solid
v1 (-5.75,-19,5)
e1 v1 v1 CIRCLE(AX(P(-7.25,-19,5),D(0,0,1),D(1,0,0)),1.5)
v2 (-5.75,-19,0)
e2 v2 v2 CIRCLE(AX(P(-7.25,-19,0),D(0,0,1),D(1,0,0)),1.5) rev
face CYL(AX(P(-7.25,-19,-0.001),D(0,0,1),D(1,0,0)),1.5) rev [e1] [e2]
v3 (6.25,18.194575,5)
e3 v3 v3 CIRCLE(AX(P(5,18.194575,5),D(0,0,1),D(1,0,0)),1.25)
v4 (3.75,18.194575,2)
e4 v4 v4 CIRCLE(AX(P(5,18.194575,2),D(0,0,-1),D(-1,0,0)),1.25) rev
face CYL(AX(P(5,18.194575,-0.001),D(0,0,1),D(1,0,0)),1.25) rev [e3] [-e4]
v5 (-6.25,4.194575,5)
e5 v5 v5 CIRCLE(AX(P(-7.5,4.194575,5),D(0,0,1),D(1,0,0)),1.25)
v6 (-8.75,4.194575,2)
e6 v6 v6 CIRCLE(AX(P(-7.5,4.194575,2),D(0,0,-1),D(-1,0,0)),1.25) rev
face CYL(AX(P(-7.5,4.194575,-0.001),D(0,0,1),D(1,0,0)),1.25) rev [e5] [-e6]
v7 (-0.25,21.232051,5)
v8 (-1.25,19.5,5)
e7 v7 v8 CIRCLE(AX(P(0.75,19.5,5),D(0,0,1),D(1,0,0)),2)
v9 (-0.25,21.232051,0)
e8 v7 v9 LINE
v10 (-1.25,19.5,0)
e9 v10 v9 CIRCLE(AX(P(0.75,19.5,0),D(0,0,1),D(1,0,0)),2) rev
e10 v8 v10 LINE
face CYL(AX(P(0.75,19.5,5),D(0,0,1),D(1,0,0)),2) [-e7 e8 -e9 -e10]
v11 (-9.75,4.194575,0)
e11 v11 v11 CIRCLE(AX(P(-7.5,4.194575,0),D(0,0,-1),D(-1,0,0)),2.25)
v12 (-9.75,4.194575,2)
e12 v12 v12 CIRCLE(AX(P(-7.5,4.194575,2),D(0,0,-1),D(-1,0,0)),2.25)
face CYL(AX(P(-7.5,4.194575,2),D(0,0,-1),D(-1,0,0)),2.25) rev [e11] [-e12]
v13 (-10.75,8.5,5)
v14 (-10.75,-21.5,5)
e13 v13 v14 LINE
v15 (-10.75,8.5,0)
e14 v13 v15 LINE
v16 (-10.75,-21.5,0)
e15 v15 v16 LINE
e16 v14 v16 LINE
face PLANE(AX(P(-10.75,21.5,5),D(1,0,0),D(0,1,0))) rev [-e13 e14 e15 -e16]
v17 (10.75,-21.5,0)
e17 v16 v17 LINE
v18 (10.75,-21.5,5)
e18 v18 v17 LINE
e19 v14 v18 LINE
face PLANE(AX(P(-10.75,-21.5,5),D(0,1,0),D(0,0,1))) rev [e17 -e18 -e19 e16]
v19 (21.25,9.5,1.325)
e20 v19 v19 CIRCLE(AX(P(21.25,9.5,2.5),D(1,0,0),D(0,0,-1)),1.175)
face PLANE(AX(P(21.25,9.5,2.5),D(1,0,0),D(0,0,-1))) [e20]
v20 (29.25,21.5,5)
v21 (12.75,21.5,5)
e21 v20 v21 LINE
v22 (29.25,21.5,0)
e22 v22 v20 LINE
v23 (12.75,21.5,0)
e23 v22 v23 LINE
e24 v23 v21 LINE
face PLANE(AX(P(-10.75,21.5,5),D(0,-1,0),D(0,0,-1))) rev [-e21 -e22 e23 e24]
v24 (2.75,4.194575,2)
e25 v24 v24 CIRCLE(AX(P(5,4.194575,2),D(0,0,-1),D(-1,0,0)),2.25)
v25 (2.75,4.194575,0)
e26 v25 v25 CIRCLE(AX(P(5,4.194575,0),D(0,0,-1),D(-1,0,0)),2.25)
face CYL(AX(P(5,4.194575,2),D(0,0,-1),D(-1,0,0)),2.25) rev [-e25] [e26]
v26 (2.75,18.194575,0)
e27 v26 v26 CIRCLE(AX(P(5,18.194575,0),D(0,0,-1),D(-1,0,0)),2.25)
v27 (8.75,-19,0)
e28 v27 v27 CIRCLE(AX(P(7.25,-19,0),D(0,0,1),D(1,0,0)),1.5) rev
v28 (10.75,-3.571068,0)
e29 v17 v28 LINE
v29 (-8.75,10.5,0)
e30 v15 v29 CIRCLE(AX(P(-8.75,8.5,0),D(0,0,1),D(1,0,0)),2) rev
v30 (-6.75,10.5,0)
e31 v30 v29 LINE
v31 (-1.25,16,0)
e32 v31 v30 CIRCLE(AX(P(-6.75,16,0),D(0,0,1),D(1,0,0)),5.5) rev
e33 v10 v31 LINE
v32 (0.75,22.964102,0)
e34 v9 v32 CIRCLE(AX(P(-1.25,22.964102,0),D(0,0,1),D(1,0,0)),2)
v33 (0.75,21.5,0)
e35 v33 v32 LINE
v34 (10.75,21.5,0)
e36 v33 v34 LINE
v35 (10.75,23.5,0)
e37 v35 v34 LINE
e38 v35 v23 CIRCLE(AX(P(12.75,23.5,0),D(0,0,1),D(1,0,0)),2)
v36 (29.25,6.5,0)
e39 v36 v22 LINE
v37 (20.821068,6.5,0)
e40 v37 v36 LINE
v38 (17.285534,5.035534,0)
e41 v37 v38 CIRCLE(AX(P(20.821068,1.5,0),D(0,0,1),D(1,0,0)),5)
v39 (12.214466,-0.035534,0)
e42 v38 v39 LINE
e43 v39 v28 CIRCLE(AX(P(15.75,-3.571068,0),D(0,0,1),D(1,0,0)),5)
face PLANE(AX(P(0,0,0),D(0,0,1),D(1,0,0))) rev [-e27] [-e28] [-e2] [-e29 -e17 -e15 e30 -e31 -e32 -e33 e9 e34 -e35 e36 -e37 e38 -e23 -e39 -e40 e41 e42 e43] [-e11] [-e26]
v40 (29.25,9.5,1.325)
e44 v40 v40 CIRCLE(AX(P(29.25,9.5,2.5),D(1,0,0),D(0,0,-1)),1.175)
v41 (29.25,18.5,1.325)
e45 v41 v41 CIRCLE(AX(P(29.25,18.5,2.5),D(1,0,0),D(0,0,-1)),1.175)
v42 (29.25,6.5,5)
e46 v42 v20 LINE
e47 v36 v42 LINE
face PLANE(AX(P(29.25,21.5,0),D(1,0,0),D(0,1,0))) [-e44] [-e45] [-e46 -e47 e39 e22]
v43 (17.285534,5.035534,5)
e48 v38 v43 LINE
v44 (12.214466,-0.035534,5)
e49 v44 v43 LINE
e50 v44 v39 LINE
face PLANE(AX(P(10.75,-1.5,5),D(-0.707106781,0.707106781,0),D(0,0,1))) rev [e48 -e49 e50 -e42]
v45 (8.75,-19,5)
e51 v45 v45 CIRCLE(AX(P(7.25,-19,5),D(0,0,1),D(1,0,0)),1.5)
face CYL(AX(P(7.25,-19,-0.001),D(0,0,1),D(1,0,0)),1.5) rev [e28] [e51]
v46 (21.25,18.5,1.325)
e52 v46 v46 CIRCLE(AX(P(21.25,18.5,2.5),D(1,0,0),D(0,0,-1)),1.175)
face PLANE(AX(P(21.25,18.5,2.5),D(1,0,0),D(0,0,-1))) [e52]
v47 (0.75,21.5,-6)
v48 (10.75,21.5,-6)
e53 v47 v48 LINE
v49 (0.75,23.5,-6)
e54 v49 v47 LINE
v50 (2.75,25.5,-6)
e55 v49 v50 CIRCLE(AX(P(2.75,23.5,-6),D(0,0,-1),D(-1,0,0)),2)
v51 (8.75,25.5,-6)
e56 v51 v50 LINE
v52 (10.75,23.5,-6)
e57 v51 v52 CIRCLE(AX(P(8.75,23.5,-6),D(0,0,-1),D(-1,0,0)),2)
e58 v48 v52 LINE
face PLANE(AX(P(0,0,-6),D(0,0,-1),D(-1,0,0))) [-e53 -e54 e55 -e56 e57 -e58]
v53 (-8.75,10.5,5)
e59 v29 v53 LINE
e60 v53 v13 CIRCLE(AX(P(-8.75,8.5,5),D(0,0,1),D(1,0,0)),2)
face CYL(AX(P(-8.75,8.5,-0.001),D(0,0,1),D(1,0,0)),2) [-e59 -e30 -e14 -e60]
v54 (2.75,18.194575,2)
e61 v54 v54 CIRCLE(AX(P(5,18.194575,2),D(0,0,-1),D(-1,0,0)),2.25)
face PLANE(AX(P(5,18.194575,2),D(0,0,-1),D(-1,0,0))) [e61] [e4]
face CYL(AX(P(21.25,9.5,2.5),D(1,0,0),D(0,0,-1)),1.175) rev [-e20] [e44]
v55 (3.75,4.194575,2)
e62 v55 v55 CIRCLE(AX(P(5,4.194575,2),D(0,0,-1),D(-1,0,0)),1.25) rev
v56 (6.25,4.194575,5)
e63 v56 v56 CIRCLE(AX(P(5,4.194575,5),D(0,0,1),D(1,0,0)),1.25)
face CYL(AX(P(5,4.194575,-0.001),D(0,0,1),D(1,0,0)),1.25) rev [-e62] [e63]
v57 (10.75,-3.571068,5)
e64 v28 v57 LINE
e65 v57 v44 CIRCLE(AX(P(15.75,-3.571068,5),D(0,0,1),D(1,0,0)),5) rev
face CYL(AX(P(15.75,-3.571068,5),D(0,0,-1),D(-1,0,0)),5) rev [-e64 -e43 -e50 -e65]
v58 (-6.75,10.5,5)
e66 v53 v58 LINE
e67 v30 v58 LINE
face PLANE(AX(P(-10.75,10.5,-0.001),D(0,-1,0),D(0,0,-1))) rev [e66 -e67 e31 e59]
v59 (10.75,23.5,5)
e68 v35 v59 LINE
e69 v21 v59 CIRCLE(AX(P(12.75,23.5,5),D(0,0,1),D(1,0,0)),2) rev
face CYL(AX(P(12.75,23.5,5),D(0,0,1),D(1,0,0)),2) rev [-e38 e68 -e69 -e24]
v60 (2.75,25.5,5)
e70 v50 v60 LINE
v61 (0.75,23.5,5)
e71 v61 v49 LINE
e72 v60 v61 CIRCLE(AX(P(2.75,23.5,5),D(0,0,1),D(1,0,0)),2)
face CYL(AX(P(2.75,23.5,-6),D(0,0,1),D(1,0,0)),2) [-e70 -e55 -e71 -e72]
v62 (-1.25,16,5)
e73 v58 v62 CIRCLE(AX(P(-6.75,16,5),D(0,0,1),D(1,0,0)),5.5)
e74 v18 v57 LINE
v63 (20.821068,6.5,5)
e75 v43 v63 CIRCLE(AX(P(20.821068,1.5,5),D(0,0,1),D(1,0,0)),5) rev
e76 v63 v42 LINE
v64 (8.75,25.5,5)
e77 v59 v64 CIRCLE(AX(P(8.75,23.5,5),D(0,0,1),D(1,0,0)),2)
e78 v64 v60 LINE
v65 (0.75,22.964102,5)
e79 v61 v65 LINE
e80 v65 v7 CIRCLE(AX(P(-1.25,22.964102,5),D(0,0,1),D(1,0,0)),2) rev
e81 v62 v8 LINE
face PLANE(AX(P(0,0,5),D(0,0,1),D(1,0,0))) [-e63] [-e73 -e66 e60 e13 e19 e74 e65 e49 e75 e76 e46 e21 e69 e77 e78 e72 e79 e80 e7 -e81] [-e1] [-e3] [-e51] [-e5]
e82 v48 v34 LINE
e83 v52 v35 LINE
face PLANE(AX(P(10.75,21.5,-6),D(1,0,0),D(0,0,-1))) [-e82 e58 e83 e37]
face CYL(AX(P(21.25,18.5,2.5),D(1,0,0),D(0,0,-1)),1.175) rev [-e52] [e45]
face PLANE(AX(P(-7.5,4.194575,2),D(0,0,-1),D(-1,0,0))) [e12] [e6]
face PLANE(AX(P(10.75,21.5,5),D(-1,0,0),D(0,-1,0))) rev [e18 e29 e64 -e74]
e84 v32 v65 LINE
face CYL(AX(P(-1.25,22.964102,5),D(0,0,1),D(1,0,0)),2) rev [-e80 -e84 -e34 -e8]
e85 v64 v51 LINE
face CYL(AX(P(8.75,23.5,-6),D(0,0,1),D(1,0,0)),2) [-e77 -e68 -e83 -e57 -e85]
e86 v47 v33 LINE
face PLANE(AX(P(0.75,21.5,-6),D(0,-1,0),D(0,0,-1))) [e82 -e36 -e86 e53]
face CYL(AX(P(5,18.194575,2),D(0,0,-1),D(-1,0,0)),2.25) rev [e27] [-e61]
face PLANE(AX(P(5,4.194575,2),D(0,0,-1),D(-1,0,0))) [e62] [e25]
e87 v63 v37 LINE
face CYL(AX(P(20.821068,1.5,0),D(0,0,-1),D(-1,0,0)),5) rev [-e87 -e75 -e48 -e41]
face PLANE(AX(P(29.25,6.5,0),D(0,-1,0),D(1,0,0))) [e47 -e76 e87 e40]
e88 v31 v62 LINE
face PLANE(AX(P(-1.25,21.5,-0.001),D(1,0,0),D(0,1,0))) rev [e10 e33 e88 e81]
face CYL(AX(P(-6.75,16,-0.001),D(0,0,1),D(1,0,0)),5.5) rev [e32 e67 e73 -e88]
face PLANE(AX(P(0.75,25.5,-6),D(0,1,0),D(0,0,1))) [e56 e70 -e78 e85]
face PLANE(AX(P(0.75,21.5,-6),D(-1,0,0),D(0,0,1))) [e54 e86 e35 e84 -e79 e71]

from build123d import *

# Parameters (mm, degrees)
SKETCH1_W           = 21.5
SKETCH1_H           = 43
BOSS_EXTRUDE1_DEPTH = 5
CUT_EXTRUDE1_DEPTH  = 5
SKETCH7_W           = 18.5
SKETCH7_H           = 15
BOSS_EXTRUDE2_DEPTH = 5
SKETCH8_R           = 1.175
CUT_EXTRUDE4_DEPTH  = 8
CUT_EXTRUDE5_REACH  = 38.644
SKETCH11_R          = 1.25
CUT_EXTRUDE6_REACH  = 38.644
SKETCH3_R           = 1.5
SKETCH12_R          = 2.25
CUT_EXTRUDE7_DEPTH  = 2
CHAMFER1_SIZE       = 8
CUT_EXTRUDE8_REACH  = 38.644
FILLET4_R           = 2
FILLET5_R           = 5
SKETCH17_W          = 10
SKETCH17_H          = 4
BOSS_EXTRUDE3_DEPTH = 11
FILLET6_R           = 2


with BuildPart() as part:
    # Sketch1 → Boss-Extrude1 (new body)
    with BuildSketch(Plane.XY):
        Rectangle(SKETCH1_W, SKETCH1_H)
    extrude(amount=BOSS_EXTRUDE1_DEPTH)

    # Sketch2 → Cut-Extrude1 (cut)
    with BuildSketch(Plane.XY.offset(5)):
        with BuildLine():
            Line((-6.75, 12.499561173), (-10.75, 12.499561173))
            Line((-10.75, 12.499561173), (-10.75, 21.5))
            Line((-10.75, 21.5), (-3.25, 21.5))
            Line((-3.25, 21.5), (-3.25, 15.944574555))
            ThreePointArc((-3.25, 15.944574555), (-4.294490012, 13.505297076), (-6.75, 12.499561173))
        make_face()
    extrude(amount=-CUT_EXTRUDE1_DEPTH, mode=Mode.SUBTRACT)

    # Sketch7 → Boss-Extrude2 (add)
    with BuildSketch(Plane.XY.offset(5)):
        with Locations((20, 14)):
            Rectangle(SKETCH7_W, SKETCH7_H)
    extrude(amount=-BOSS_EXTRUDE2_DEPTH)

    # Sketch8 → Cut-Extrude4 (cut)
    with BuildSketch(Plane(origin=(29.25, 0, 0), x_dir=(0, 0, -1), z_dir=(1, 0, 0))):
        with Locations((-2.5, 9.5)):
            Circle(SKETCH8_R)
        with Locations((-2.5, 18.5)):
            Circle(SKETCH8_R)
    extrude(amount=-CUT_EXTRUDE4_DEPTH, mode=Mode.SUBTRACT)

    # Sketch11 → Cut-Extrude5 (cut, up to next)
    with BuildSketch(Plane.XY.offset(5), mode=Mode.PRIVATE) as cut_extrude5_sk1:
        with Locations((5, 4.194574555)):
            Circle(SKETCH11_R)
    cut_extrude5_tool1 = extrude(cut_extrude5_sk1.sketch, amount=-CUT_EXTRUDE5_REACH, mode=Mode.PRIVATE) & part.part
    # Sketch11 → Cut-Extrude5 (cut, up to next)
    with BuildSketch(Plane.XY.offset(5), mode=Mode.PRIVATE) as cut_extrude5_sk2:
        with Locations((-7.5, 4.194574555)):
            Circle(SKETCH11_R)
    cut_extrude5_tool2 = extrude(cut_extrude5_sk2.sketch, amount=-CUT_EXTRUDE5_REACH, mode=Mode.PRIVATE) & part.part
    # Sketch11 → Cut-Extrude5 (cut, up to next)
    with BuildSketch(Plane.XY.offset(5), mode=Mode.PRIVATE) as cut_extrude5_sk3:
        with Locations((5, 18.194574555)):
            Circle(SKETCH11_R)
    cut_extrude5_tool3 = extrude(cut_extrude5_sk3.sketch, amount=-CUT_EXTRUDE5_REACH, mode=Mode.PRIVATE) & part.part
    add(cut_extrude5_tool1.solids().sort_by_distance((5, 4.194575, 5))[0], mode=Mode.SUBTRACT)
    add(cut_extrude5_tool2.solids().sort_by_distance((-7.5, 4.194575, 5))[0], mode=Mode.SUBTRACT)
    add(cut_extrude5_tool3.solids().sort_by_distance((5, 18.194575, 5))[0], mode=Mode.SUBTRACT)

    # Sketch3 → Cut-Extrude6 (cut, up to next)
    with BuildSketch(Plane.XY.offset(5), mode=Mode.PRIVATE) as cut_extrude6_sk1:
        with Locations((-7.25, -19)):
            Circle(SKETCH3_R)
    cut_extrude6_tool1 = extrude(cut_extrude6_sk1.sketch, amount=-CUT_EXTRUDE6_REACH, mode=Mode.PRIVATE) & part.part
    # Sketch3 → Cut-Extrude6 (cut, up to next)
    with BuildSketch(Plane.XY.offset(5), mode=Mode.PRIVATE) as cut_extrude6_sk2:
        with Locations((7.25, -19)):
            Circle(SKETCH3_R)
    cut_extrude6_tool2 = extrude(cut_extrude6_sk2.sketch, amount=-CUT_EXTRUDE6_REACH, mode=Mode.PRIVATE) & part.part
    add(cut_extrude6_tool1.solids().sort_by_distance((-7.25, -19, 5))[0], mode=Mode.SUBTRACT)
    add(cut_extrude6_tool2.solids().sort_by_distance((7.25, -19, 5))[0], mode=Mode.SUBTRACT)

    # Sketch12 → Cut-Extrude7 (cut)
    with BuildSketch(Plane(origin=(0, 0, 0), x_dir=(-1, 0, 0), z_dir=(0, 0, -1))):
        with Locations((-5, 4.194574555)):
            Circle(SKETCH12_R)
        with Locations((-5, 18.194574555)):
            Circle(SKETCH12_R)
        with Locations((7.5, 4.194574555)):
            Circle(SKETCH12_R)
    extrude(amount=-CUT_EXTRUDE7_DEPTH, mode=Mode.SUBTRACT)

    # Chamfer1
    chamfer1_edges = [part.edges().sort_by_distance(p)[0] for p in [
        (10.75, 6.5, 2.5),
    ]]
    chamfer(chamfer1_edges, length=CHAMFER1_SIZE)

    # Sketch14 → Cut-Extrude8 (cut, up to next)
    with BuildSketch(Plane.XY.offset(5), mode=Mode.PRIVATE) as cut_extrude8_sk1:
        with BuildLine():
            Line((-10.75, 10.5), (-6.75, 10.5))
            ThreePointArc((-6.75, 10.5), (-2.860912703, 12.110912703), (-1.25, 16))
            Line((-1.25, 16), (-1.25, 21.5))
            Line((-1.25, 21.5), (-10.75, 21.5))
            Line((-10.75, 21.5), (-10.75, 10.5))
        make_face()
    cut_extrude8_tool1 = extrude(cut_extrude8_sk1.sketch, amount=-CUT_EXTRUDE8_REACH, mode=Mode.PRIVATE) & part.part
    add(cut_extrude8_tool1.solids().sort_by_distance((-6.23325, 16.282927, 5))[0], mode=Mode.SUBTRACT)

    # Fillet4
    fillet4_edges = [part.edges().sort_by_distance(p)[0] for p in [
        (-1.25, 21.5, 2.5),
        (-10.75, 10.5, 2.5),
    ]]
    fillet(fillet4_edges, radius=FILLET4_R)

    # Fillet5
    fillet5_edges = [part.edges().sort_by_distance(p)[0] for p in [
        (18.75, 6.5, 2.5),
        (10.75, -1.5, 2.5),
    ]]
    fillet(fillet5_edges, radius=FILLET5_R)

    # Sketch17 → Boss-Extrude3 (add)
    with BuildSketch(Plane.XY.offset(5)):
        with Locations((5.75, 23.5)):
            Rectangle(SKETCH17_W, SKETCH17_H)
    extrude(amount=-BOSS_EXTRUDE3_DEPTH)

    # Fillet6
    fillet6_edges = [part.edges().sort_by_distance(p)[0] for p in [
        (0.75, 21.5, 2.5),
        (10.75, 21.5, 2.5),
        (10.75, 25.5, -0.5),
        (0.75, 25.5, -0.5),
    ]]
    fillet(fillet6_edges, radius=FILLET6_R - 0.0001)  # a hair under: the kernel refuses the full size


solid = part.part
